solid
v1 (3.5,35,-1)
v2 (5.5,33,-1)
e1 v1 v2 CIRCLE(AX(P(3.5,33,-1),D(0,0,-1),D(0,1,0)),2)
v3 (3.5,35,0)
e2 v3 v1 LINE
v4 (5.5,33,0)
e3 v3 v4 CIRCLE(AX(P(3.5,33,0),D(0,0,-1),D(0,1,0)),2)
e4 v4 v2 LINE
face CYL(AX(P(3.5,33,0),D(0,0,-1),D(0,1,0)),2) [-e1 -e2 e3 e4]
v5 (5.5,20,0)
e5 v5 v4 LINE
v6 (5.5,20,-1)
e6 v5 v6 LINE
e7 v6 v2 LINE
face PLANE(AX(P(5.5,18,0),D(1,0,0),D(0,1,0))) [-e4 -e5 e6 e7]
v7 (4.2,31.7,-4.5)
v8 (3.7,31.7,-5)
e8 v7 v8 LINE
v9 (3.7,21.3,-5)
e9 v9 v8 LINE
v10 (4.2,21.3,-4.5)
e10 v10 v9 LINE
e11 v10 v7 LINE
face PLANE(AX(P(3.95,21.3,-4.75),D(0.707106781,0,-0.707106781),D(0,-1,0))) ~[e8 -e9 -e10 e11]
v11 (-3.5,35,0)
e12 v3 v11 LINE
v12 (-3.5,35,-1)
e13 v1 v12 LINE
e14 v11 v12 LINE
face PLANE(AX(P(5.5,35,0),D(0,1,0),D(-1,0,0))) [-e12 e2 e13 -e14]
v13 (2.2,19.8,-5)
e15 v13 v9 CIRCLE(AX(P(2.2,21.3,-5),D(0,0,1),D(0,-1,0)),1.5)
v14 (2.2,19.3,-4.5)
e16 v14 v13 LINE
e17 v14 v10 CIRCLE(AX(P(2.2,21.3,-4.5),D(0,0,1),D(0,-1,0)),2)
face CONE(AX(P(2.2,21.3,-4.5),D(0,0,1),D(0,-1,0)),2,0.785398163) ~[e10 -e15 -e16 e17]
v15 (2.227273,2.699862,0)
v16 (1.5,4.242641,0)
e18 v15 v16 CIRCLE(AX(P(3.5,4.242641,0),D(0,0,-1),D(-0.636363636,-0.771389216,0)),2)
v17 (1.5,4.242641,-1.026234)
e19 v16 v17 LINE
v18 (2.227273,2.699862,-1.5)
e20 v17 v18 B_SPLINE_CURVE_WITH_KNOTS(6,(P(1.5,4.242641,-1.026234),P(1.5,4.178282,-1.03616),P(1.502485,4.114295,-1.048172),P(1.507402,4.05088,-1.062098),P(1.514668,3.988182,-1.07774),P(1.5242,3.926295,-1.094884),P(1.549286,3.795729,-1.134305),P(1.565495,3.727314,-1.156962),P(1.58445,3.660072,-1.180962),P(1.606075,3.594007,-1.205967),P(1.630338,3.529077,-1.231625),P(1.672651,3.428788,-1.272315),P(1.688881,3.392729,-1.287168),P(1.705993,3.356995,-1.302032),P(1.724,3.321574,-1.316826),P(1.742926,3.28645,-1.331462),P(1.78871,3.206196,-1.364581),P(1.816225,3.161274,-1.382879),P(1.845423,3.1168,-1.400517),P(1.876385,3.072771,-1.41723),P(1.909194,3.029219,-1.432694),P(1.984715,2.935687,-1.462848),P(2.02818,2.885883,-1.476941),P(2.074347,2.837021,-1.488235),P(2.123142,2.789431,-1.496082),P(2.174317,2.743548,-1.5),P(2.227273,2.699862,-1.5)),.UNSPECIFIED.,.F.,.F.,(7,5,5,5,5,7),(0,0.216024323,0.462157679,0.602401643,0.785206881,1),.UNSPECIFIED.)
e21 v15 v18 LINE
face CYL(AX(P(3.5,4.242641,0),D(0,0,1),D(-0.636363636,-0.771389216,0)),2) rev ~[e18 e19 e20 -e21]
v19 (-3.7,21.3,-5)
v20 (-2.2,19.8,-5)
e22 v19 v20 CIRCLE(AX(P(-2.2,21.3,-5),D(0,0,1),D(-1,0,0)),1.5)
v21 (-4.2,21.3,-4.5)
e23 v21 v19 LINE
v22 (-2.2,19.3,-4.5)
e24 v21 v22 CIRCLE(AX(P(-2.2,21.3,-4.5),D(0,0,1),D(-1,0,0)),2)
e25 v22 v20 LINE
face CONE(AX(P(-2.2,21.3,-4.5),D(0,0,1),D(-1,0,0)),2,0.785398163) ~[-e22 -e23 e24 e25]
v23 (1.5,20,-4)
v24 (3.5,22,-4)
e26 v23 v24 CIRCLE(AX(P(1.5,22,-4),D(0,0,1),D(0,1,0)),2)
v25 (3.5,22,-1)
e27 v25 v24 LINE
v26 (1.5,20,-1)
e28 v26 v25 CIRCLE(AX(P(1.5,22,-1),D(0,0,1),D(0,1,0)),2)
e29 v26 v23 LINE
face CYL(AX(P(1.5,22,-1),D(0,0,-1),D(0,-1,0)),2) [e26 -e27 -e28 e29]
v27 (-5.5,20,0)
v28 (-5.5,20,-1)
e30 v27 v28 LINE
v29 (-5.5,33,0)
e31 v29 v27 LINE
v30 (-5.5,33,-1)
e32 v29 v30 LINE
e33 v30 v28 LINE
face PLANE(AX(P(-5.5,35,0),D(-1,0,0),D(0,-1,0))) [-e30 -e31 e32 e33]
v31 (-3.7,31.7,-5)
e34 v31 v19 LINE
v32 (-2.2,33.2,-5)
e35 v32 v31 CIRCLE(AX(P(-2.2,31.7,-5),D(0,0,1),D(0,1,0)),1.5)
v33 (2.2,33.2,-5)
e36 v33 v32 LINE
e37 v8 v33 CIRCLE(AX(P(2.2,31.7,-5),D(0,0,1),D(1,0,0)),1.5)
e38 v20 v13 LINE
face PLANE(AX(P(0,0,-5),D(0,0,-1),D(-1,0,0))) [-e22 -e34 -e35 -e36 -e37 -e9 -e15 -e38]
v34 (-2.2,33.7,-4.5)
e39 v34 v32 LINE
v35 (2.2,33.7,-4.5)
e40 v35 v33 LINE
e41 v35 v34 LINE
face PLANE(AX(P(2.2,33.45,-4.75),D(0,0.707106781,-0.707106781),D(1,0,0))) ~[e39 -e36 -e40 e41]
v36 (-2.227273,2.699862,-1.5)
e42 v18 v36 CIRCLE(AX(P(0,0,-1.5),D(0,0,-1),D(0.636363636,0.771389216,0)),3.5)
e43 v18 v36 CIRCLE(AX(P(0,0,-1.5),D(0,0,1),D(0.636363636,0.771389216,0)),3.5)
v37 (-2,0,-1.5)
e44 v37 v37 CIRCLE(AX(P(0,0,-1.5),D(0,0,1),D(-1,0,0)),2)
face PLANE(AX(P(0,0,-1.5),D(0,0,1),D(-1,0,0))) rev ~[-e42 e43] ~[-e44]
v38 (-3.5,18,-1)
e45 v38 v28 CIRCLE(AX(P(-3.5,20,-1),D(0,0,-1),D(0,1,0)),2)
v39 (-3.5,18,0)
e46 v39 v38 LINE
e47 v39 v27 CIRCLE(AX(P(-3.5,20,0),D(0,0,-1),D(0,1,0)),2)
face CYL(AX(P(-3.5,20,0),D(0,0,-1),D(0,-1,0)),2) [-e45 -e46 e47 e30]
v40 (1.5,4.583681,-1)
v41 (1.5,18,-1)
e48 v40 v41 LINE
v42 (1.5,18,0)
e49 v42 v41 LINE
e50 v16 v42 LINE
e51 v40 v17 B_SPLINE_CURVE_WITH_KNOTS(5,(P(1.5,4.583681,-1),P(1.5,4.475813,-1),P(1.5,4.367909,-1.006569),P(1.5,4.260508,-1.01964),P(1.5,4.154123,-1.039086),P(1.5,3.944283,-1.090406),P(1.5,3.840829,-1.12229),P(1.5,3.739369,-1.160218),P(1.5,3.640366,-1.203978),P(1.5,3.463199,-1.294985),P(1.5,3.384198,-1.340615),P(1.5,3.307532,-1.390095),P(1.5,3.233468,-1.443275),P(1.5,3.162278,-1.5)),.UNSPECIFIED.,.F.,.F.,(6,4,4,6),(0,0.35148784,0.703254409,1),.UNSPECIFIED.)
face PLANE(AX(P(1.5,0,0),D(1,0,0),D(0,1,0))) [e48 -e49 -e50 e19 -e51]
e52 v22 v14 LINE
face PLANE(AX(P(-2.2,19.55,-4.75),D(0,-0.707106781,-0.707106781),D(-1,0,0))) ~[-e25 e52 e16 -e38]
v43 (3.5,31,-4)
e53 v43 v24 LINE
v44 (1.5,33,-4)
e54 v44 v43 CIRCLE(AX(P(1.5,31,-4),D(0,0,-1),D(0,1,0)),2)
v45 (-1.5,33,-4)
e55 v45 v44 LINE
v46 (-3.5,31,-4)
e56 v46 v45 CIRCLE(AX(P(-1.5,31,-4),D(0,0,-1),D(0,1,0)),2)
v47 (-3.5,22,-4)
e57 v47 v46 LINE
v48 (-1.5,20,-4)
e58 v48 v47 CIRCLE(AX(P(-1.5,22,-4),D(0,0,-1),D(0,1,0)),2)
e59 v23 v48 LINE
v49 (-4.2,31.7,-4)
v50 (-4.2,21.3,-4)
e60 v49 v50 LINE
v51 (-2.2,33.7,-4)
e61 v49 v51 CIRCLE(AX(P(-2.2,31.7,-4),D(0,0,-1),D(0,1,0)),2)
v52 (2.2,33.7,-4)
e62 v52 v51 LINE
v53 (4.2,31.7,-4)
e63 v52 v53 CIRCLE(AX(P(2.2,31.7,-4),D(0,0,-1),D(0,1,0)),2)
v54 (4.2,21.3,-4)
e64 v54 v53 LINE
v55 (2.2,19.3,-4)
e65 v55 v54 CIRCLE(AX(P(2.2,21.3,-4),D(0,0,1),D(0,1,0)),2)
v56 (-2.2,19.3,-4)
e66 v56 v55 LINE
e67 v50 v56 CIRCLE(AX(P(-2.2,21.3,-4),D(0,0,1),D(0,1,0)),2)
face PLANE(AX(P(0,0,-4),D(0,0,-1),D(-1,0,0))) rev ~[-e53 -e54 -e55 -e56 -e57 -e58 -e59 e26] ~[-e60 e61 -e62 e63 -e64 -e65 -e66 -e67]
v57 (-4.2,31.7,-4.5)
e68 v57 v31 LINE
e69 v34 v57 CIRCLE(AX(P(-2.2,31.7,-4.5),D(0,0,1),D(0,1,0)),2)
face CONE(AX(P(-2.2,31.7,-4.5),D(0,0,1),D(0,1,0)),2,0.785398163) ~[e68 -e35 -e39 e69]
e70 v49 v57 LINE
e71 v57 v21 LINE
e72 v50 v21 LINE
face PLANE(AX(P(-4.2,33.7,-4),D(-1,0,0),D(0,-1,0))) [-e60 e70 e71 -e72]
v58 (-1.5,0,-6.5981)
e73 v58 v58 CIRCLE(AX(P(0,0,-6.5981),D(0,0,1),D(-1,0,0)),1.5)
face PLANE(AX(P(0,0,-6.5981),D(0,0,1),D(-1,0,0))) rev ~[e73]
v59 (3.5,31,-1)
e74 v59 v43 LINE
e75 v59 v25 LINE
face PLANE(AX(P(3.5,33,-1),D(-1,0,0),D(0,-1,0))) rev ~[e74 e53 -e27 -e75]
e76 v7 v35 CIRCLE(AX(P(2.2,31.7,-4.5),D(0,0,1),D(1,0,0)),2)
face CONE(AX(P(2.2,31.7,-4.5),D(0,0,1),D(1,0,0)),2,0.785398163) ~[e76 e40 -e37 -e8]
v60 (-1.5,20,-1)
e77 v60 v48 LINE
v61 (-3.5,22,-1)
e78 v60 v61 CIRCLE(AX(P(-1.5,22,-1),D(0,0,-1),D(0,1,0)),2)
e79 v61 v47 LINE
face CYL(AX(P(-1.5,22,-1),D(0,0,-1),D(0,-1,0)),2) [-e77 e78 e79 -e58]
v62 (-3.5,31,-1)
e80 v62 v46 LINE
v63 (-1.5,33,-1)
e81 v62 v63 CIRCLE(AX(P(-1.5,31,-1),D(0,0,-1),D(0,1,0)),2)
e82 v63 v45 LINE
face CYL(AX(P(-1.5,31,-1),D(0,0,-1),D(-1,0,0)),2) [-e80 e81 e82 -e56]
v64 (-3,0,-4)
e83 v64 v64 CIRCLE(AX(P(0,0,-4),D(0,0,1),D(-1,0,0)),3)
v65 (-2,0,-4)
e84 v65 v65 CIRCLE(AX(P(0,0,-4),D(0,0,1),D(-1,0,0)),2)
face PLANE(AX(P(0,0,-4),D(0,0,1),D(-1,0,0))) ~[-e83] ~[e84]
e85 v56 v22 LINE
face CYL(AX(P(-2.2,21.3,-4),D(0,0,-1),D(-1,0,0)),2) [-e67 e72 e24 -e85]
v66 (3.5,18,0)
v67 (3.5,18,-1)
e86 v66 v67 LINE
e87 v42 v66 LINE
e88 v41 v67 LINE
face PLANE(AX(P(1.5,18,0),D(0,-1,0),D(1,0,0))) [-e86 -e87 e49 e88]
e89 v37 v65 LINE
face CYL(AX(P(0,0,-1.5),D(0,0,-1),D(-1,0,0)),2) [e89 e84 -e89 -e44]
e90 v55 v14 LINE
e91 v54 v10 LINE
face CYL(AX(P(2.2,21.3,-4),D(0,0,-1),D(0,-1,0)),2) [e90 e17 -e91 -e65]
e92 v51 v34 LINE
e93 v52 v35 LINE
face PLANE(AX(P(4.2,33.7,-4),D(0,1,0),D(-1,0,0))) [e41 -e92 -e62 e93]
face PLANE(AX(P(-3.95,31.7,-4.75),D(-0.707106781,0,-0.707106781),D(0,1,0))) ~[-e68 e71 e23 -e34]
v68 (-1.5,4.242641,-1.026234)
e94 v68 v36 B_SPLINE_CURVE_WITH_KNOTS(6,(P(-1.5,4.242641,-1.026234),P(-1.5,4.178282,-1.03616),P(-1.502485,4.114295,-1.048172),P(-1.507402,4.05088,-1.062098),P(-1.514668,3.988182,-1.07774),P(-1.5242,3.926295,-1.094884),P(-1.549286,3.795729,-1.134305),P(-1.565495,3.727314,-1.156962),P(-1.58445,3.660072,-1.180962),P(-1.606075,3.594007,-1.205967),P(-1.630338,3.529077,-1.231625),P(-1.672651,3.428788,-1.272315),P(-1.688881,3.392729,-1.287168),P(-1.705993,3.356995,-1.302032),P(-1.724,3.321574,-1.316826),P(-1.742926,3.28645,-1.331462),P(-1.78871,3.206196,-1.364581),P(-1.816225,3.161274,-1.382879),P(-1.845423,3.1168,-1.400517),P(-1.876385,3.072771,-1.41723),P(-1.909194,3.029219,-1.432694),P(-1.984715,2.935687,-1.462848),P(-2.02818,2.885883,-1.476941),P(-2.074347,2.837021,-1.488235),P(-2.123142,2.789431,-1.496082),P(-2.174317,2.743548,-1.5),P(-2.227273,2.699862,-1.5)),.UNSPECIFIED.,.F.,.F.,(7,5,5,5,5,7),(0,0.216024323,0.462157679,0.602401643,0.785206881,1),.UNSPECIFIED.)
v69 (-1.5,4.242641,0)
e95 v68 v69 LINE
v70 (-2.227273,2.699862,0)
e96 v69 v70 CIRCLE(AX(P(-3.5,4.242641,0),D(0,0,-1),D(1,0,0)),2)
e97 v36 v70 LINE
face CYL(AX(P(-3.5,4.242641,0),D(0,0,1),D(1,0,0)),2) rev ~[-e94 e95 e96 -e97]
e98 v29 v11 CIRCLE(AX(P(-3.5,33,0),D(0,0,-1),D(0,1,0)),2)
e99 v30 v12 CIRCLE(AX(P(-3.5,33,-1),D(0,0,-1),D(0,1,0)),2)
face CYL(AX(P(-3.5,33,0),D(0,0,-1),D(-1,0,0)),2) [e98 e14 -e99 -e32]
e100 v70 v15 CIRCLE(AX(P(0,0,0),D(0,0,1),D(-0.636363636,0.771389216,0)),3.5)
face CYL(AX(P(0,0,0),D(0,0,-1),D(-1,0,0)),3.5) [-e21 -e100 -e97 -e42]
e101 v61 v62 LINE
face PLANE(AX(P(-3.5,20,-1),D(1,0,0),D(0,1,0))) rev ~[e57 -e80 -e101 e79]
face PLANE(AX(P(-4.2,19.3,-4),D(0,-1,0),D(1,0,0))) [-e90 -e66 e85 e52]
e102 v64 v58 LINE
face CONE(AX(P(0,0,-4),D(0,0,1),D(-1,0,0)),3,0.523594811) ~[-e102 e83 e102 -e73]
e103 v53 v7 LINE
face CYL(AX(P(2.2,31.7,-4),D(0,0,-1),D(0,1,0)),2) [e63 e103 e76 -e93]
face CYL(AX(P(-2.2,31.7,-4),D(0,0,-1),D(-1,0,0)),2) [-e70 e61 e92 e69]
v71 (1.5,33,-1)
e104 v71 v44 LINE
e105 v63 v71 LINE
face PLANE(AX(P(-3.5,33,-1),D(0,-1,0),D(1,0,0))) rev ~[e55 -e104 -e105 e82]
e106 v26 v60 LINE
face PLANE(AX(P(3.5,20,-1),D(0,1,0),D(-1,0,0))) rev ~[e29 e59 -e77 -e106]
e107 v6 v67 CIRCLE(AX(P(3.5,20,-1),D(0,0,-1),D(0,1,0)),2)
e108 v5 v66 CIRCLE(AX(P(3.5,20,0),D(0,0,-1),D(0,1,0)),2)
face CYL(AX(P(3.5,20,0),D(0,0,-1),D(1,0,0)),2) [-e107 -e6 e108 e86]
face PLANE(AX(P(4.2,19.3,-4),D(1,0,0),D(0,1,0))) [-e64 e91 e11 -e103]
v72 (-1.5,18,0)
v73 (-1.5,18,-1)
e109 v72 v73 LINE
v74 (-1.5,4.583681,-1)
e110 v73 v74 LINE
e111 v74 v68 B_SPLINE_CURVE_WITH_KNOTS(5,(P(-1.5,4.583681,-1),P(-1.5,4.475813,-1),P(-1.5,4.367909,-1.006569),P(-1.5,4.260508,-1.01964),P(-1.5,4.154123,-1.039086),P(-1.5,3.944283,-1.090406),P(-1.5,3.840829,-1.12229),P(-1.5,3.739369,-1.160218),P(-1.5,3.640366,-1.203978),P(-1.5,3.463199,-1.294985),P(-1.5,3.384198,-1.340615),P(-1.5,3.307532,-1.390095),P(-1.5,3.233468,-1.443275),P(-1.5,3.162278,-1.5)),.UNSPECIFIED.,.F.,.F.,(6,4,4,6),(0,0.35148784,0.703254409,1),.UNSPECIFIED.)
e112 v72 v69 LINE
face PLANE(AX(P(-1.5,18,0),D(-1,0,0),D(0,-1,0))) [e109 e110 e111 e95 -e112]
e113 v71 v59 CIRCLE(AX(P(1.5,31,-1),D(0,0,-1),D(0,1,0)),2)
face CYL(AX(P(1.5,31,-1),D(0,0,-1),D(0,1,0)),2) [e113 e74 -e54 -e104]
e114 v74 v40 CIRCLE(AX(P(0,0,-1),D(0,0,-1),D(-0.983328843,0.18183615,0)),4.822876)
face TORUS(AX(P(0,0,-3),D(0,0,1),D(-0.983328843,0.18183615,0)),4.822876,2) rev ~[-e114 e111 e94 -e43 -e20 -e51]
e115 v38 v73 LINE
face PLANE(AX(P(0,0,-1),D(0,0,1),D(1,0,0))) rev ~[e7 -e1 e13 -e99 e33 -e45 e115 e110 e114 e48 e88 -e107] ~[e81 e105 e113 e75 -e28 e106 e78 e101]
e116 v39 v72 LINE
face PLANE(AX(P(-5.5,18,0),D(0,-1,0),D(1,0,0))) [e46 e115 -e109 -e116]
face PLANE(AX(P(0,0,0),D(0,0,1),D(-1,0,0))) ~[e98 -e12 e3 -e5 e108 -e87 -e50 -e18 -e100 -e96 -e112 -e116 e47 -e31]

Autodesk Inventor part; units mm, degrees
ref_plane "YZ Plane" through (0, 0, 0) normal (1, 0, 0) x (0, 1, 0)
ref_plane "XZ Plane" through (0, 0, 0) normal (0, 1, 0) x (-1, 0, 0)
ref_plane "XY Plane" through (0, 0, 0) normal (0, 0, 1) x (1, 0, 0)
sketch "Sketch1" plane through (0, 0, 0) normal (0, 1, 0) x (-1, 0, 0)
  line L0 (0, 0) -> (3.5, 0)
  line L1 (3.5, 0) -> (3.5, -1.5)
  line L2 (3.5, -1.5) -> (2, -1.5)
  line L3 (2, -1.5) -> (2, -4)
  line L4 (2, -4) -> (3, -4)
  line L5 (3, -4) -> (1.5, -6.5981)
  line L6 (1.5, -6.5981) -> (0, -6.5981)
  line L7 (0, -6.5981) -> (0, 0)
  line L8 (0, -7.9177) -> (0, 1.3196) projected
  dimension "d0" = 3.5
  dimension "d1" = 1.5
  dimension "d3" = 2.5
  dimension "d4" = 2
  dimension "d5" = 1
  dimension "d6" = 1.5
  dimension "d7" = 60
revolve "Revolution1" add sketch "Sketch1" angle 360 about axis through (0, 0, -10) along (0, 0, 1)
sketch "Sketch2" plane through (0, 0, 0) normal (0, 0, 1) x (1, 0, 0)
  circle A0 centre (0, 0) radius 3.5 construction
  line L0 (-1.5, 0) -> (1.5, 0)
  line L1 (1.5, 0) -> (1.5, 18)
  line L2 (1.5, 18) -> (-1.5, 18)
  line L3 (-1.5, 18) -> (-1.5, 0)
  line L4 (-5.5, 18) -> (5.5, 18)
  line L5 (5.5, 18) -> (5.5, 35)
  line L6 (5.5, 35) -> (-5.5, 35)
  line L7 (-5.5, 35) -> (-5.5, 18)
  point P0 (0, 18)
  dimension "d9" = 3
  dimension "d10" = 18
  dimension "d11" = 11
  dimension "d12" = 17
extrude "Extrusion1" add sketch "Sketch2" against normal blind 1
sketch "Sketch3" plane through (0, 0, -1) normal (0, 0, -1) x (-1, 0, 0)
  line L0 (3.5, 33) -> (-3.5, 33)
  line L1 (-3.5, 33) -> (-3.5, 20)
  line L2 (-3.5, 20) -> (3.5, 20)
  line L3 (3.5, 20) -> (3.5, 33)
  line L4 (5.5, 35) -> (-5.5, 35) projected
  line L5 (5.5, 18) -> (5.5, 35) projected
  point P0 (0, 0)
  point P1 (0, 33)
  point P2 (0, 35)
  point P3 (3.5, 26.5)
  point P4 (5.5, 26.5)
  dimension "d15" = 7
  dimension "d16" = 13
extrude "Extrusion2" add sketch "Sketch3" along normal blind 3
sketch "Sketch4" plane through (0, 0, -4) normal (0, 0, -1) x (-1, 0, 0)
  line L0 (-3.5, 33) -> (-3.5, 20) projected
  line L1 (-3.5, 20) -> (3.5, 20) projected
  line L2 (3.5, 20) -> (3.5, 33) projected
  line L3 (3.5, 33) -> (-3.5, 33) projected
  line L4 (4.2, 33.7) -> (4.2, 19.3)
  line L5 (4.2, 19.3) -> (-4.2, 19.3)
  line L6 (-4.2, 19.3) -> (-4.2, 33.7)
  line L7 (-4.2, 33.7) -> (4.2, 33.7)
  point P0 (0, 0)
  dimension "d20" = 0.7
extrude "Extrusion3" add sketch "Sketch4" along normal blind 1 contours L3 L2 L1 L0 | L4 L5 L6 L7
fillet "Fillet1" radius 2 12 edges at (-5.5, 35, -0.5) (-5.5, 18, -0.5) (5.5, 35, -0.5) (5.5, 18, -0.5) (3.5, 20, -2.5) (3.5, 33, -2.5) (-3.5, 33, -2.5) (-3.5, 20, -2.5) (-4.2, 19.3, -4.5) (4.2, 19.3, -4.5) (4.2, 33.7, -4.5) (-4.2, 33.7, -4.5)
chamfer "Chamfer1" distance 0.5 angle 45 8 edges at (-4.2, 26.5, -5) (-3.6142, 33.1142, -5) (0, 33.7, -5) (3.6142, 33.1142, -5) (4.2, 26.5, -5) (3.6142, 19.8858, -5) (0, 19.3, -5) (-3.6142, 19.8858, -5)
fillet "Fillet2" radius 2 3 edges at (1.5, 3.1623, -0.5) (0, 3.5, -1) (-1.5, 3.1623, -0.5)
properties part number "USB-C_cover" material "PC/ABS Plastic"
